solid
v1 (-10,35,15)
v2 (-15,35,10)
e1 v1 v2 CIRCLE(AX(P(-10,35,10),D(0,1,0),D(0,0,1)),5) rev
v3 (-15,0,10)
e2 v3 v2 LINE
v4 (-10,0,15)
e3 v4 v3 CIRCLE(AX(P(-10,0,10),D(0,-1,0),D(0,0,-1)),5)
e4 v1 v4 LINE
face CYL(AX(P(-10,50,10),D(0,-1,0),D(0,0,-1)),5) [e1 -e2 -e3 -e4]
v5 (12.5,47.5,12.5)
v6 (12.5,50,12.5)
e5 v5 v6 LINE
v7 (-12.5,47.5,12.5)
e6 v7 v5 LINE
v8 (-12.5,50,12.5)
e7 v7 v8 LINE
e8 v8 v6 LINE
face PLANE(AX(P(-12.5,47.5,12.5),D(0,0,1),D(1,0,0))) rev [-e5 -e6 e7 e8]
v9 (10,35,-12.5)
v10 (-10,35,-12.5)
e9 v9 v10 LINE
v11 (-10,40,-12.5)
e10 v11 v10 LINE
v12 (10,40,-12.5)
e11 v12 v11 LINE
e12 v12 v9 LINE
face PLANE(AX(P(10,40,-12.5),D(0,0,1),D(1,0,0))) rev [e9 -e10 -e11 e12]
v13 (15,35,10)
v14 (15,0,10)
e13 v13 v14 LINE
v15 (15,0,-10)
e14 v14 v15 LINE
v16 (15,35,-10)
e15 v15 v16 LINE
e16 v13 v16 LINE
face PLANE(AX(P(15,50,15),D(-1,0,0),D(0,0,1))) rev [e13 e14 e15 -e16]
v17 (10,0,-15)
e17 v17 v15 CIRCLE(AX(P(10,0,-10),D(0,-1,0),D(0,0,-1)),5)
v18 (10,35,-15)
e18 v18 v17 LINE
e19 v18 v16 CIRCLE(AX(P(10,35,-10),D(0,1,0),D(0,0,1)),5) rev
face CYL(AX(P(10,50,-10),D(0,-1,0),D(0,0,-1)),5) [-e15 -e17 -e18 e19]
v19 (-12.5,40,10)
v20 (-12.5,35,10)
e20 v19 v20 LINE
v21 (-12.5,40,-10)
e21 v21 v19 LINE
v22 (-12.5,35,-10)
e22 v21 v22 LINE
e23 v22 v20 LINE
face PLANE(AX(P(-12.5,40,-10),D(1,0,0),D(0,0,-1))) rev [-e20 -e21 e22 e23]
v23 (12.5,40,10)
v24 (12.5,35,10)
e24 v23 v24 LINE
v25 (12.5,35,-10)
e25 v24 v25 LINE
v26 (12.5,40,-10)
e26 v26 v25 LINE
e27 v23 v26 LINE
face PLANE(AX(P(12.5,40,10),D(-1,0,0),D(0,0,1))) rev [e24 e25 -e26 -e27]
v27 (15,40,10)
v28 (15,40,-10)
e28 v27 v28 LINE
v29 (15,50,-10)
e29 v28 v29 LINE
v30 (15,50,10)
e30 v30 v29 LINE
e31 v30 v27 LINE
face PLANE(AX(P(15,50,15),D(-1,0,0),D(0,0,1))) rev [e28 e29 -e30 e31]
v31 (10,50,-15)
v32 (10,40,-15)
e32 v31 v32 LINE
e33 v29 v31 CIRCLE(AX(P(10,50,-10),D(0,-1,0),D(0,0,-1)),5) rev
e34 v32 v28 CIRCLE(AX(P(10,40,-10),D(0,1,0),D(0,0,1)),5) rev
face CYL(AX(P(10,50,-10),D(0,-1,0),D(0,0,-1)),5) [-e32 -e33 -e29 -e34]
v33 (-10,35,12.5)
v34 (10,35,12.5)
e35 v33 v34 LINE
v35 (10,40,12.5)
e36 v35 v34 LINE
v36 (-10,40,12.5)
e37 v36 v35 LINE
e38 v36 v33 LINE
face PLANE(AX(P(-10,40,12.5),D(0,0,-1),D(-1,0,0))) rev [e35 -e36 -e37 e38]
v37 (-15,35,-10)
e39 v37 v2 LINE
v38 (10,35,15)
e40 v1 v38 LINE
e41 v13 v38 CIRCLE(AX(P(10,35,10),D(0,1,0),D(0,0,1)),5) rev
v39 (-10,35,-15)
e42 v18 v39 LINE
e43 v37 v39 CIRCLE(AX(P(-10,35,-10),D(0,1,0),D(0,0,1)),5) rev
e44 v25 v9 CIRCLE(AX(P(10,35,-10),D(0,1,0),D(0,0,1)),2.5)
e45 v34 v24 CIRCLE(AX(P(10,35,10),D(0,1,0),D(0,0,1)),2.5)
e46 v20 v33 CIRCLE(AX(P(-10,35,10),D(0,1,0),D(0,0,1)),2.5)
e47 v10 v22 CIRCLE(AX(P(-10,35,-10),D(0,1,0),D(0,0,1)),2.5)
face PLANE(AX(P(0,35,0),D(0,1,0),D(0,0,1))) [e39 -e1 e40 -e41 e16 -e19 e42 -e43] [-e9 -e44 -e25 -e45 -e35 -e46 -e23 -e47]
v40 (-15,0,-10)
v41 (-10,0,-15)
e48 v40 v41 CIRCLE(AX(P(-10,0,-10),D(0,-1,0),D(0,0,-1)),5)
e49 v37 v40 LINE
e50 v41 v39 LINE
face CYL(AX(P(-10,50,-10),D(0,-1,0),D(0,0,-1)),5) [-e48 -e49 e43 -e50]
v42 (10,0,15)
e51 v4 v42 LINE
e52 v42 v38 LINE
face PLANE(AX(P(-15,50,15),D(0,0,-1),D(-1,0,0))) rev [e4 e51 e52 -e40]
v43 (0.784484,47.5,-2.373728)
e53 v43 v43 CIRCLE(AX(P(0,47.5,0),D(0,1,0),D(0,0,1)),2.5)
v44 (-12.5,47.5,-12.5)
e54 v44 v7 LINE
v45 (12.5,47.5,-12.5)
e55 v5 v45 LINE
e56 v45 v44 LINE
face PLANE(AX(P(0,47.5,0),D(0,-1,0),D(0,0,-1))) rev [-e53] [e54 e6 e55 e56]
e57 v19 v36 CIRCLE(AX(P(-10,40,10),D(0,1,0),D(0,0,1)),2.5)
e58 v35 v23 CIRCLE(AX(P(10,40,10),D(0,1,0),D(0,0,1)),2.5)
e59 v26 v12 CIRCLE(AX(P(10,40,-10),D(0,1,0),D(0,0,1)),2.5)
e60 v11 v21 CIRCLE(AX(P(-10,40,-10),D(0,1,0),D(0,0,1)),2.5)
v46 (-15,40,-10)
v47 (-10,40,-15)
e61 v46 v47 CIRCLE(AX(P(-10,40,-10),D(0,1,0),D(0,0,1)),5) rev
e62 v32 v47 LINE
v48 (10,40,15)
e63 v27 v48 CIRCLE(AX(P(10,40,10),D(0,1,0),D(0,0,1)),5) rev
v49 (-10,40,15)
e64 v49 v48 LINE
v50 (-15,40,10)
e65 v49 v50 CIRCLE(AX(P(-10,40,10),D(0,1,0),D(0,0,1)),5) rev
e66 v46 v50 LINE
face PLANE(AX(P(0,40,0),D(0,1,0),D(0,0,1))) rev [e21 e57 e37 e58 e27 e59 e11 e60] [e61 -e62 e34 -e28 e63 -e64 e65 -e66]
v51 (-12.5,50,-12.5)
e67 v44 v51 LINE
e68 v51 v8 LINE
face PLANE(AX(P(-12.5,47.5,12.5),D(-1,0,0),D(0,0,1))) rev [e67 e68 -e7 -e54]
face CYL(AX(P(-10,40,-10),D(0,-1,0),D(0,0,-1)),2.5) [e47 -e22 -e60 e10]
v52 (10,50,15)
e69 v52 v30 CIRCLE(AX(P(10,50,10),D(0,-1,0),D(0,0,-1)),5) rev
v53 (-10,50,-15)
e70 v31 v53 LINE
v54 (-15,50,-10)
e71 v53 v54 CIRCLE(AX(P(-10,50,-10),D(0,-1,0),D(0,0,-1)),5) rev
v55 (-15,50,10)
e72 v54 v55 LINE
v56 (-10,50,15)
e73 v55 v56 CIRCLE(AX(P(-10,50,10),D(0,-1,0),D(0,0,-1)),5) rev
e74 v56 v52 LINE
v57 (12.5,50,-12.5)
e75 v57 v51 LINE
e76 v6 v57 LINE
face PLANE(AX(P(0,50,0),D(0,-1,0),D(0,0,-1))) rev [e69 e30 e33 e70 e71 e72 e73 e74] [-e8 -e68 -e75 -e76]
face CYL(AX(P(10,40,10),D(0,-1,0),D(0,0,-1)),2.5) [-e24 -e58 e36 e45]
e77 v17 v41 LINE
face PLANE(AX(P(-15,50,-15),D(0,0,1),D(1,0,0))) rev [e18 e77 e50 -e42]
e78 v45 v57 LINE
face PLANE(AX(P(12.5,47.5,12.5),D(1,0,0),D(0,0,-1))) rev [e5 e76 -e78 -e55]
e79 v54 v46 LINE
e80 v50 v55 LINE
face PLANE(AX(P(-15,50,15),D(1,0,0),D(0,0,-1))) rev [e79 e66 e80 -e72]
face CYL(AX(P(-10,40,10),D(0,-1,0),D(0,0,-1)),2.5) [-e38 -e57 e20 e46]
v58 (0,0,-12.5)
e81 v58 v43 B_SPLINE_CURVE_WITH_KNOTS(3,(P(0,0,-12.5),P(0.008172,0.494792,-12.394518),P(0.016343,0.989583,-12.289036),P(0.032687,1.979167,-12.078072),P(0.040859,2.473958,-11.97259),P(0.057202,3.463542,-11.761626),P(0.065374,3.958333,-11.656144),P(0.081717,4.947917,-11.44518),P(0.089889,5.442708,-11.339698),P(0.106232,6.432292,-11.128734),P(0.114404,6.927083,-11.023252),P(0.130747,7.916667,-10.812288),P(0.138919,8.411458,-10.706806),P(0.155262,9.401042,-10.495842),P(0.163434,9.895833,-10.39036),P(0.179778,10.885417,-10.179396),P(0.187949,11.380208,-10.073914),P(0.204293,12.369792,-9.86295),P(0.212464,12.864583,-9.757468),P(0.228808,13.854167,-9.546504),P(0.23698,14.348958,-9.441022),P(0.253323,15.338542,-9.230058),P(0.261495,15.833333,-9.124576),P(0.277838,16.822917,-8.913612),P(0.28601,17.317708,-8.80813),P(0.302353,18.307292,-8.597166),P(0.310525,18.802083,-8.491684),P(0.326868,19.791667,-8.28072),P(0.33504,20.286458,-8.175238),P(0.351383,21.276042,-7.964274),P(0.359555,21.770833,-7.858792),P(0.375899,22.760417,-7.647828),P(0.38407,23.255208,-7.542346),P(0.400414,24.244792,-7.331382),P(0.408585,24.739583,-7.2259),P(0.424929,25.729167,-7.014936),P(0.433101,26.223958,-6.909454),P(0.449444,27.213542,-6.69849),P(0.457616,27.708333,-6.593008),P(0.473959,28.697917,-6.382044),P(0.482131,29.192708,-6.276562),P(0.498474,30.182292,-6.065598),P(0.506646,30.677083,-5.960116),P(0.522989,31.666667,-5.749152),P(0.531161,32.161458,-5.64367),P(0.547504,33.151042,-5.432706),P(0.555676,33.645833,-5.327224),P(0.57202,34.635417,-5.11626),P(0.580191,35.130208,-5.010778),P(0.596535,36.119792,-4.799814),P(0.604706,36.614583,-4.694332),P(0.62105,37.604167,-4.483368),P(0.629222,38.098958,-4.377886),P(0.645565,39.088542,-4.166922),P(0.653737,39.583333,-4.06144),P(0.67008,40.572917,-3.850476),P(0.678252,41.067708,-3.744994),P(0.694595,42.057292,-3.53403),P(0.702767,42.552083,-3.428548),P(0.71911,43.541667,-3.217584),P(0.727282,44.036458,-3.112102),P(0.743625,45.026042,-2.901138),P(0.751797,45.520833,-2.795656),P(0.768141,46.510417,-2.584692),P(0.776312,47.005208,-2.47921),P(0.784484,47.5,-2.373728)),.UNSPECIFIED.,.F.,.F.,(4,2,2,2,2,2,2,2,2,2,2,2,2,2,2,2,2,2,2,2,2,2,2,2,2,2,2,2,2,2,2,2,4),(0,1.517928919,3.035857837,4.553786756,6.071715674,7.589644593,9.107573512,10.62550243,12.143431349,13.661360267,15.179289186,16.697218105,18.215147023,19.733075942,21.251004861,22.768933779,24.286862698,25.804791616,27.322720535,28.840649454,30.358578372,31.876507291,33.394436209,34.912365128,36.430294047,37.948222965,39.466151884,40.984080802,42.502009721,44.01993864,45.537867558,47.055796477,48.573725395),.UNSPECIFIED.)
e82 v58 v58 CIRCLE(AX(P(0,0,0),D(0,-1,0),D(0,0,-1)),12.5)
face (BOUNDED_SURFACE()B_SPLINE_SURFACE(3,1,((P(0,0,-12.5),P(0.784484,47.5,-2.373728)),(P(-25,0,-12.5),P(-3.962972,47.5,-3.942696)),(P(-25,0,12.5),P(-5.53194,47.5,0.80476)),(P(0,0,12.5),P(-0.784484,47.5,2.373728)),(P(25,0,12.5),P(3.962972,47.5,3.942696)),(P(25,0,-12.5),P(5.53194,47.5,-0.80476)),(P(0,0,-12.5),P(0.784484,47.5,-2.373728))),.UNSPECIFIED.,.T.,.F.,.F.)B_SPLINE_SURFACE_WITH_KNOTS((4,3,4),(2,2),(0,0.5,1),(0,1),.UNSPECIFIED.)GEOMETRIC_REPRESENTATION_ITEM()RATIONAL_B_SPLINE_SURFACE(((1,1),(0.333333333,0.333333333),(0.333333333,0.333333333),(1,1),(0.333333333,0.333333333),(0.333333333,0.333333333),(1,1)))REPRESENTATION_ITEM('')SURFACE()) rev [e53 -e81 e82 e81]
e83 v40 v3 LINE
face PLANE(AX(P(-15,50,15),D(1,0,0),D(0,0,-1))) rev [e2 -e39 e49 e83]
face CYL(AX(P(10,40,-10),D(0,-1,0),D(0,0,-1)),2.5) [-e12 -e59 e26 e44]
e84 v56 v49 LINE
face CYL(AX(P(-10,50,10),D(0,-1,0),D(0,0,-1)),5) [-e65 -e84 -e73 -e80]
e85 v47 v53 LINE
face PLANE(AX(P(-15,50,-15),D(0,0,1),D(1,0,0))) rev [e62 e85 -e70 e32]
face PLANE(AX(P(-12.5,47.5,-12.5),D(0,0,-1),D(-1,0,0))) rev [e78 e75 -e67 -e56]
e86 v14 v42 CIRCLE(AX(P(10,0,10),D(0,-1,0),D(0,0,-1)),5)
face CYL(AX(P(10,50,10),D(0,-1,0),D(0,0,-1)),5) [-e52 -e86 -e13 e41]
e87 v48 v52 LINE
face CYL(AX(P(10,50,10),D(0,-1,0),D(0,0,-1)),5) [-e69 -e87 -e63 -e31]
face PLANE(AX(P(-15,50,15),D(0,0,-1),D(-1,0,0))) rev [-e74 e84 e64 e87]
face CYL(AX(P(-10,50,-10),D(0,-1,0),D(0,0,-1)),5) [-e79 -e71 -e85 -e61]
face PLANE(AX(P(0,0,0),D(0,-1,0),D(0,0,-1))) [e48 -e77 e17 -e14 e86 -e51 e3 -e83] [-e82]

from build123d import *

# Parameters (mm, degrees)
SKETCH2_W           = 30
SKETCH2_H           = 30
BOSS_EXTRUDE1_DEPTH = 50
SKETCH3_W           = 25
SKETCH3_H           = 25
CUT_EXTRUDE1_DEPTH  = 2.5
FILLET1_R           = 5
SKETCH9_R           = 19.95304153
CUT_EXTRUDE2_DEPTH  = 5


with BuildPart() as part:
    # Sketch2 → Boss-Extrude1 (new body)
    with BuildSketch(Plane(origin=(0, 0, 0), x_dir=(1, 0, 0), z_dir=(0, 1, 0))):
        Rectangle(SKETCH2_W, SKETCH2_H)
    extrude(amount=BOSS_EXTRUDE1_DEPTH)

    # Sketch3 → Cut-Extrude1 (cut)
    with BuildSketch(Plane(origin=(0, 50, 0), x_dir=(1, 0, 0), z_dir=(0, 1, 0))):
        Rectangle(SKETCH3_W, SKETCH3_H)
    extrude(amount=-CUT_EXTRUDE1_DEPTH, mode=Mode.SUBTRACT)

    # Fillet1
    fillet1_edges = [part.edges().sort_by_distance(p)[0] for p in [
        (15, 25, 15),
        (-15, 25, 15),
        (-15, 25, -15),
        (15, 25, -15),
    ]]
    fillet(fillet1_edges, radius=FILLET1_R)

    # Cut-Loft2: read off the stored shape, not the designer's step
    # Cut-Loft2: loft between two sections, ruled curve by curve
    cut_loft2_from = [
        Edge.make_bspline([(0, 0, -12.5), (-25, 0, -12.5), (-25, 0, 12.5), (0, 0, 12.5), (25, 0, 12.5), (25, 0, -12.5), (0, 0, -12.5)], [0, 0, 0, 0, 0.5, 0.5, 0.5, 1, 1, 1, 1], 3, [1, 0.333333333, 0.333333333, 1, 0.333333333, 0.333333333, 1]),
    ]
    cut_loft2_to = [
        Edge.make_bspline([(0.784484005, 47.5, -2.373728048), (-3.962972092, 47.5, -3.942696057), (-5.531940101, 47.5, 0.804760039), (-0.784484005, 47.5, 2.373728048), (3.962972092, 47.5, 3.942696057), (5.531940101, 47.5, -0.804760039), (0.784484005, 47.5, -2.373728048)], [0, 0, 0, 0, 0.5, 0.5, 0.5, 1, 1, 1, 1], 3, [1, 0.333333333, 0.333333333, 1, 0.333333333, 0.333333333, 1]),
    ]
    cut_loft2 = Solid(Shell([*[Face.make_surface_from_curves(cut_loft2_from[k], cut_loft2_to[k]) for k in range(1)], Face(Wire(cut_loft2_from)), Face(Wire(cut_loft2_to))]))
    add(cut_loft2, mode=Mode.SUBTRACT)

    # Sketch9 → Cut-Extrude2 (cut)
    with BuildSketch(Plane(origin=(0, 35, 0), x_dir=(1, 0, 0), z_dir=(0, 1, 0))):
        Circle(SKETCH9_R)
        with BuildLine():
            Line((12.5, -10), (12.5, 10))
            ThreePointArc((12.5, 10), (11.767766953, 11.767766953), (10, 12.5))
            Line((10, 12.5), (-10, 12.5))
            ThreePointArc((-10, 12.5), (-11.767766953, 11.767766953), (-12.5, 10))
            Line((-12.5, 10), (-12.5, -10))
            ThreePointArc((-12.5, -10), (-11.767766953, -11.767766953), (-10, -12.5))
            Line((-10, -12.5), (10, -12.5))
            ThreePointArc((10, -12.5), (11.767766953, -11.767766953), (12.5, -10))
        make_face(mode=Mode.SUBTRACT)
    extrude(amount=CUT_EXTRUDE2_DEPTH, mode=Mode.SUBTRACT)


solid = part.part
